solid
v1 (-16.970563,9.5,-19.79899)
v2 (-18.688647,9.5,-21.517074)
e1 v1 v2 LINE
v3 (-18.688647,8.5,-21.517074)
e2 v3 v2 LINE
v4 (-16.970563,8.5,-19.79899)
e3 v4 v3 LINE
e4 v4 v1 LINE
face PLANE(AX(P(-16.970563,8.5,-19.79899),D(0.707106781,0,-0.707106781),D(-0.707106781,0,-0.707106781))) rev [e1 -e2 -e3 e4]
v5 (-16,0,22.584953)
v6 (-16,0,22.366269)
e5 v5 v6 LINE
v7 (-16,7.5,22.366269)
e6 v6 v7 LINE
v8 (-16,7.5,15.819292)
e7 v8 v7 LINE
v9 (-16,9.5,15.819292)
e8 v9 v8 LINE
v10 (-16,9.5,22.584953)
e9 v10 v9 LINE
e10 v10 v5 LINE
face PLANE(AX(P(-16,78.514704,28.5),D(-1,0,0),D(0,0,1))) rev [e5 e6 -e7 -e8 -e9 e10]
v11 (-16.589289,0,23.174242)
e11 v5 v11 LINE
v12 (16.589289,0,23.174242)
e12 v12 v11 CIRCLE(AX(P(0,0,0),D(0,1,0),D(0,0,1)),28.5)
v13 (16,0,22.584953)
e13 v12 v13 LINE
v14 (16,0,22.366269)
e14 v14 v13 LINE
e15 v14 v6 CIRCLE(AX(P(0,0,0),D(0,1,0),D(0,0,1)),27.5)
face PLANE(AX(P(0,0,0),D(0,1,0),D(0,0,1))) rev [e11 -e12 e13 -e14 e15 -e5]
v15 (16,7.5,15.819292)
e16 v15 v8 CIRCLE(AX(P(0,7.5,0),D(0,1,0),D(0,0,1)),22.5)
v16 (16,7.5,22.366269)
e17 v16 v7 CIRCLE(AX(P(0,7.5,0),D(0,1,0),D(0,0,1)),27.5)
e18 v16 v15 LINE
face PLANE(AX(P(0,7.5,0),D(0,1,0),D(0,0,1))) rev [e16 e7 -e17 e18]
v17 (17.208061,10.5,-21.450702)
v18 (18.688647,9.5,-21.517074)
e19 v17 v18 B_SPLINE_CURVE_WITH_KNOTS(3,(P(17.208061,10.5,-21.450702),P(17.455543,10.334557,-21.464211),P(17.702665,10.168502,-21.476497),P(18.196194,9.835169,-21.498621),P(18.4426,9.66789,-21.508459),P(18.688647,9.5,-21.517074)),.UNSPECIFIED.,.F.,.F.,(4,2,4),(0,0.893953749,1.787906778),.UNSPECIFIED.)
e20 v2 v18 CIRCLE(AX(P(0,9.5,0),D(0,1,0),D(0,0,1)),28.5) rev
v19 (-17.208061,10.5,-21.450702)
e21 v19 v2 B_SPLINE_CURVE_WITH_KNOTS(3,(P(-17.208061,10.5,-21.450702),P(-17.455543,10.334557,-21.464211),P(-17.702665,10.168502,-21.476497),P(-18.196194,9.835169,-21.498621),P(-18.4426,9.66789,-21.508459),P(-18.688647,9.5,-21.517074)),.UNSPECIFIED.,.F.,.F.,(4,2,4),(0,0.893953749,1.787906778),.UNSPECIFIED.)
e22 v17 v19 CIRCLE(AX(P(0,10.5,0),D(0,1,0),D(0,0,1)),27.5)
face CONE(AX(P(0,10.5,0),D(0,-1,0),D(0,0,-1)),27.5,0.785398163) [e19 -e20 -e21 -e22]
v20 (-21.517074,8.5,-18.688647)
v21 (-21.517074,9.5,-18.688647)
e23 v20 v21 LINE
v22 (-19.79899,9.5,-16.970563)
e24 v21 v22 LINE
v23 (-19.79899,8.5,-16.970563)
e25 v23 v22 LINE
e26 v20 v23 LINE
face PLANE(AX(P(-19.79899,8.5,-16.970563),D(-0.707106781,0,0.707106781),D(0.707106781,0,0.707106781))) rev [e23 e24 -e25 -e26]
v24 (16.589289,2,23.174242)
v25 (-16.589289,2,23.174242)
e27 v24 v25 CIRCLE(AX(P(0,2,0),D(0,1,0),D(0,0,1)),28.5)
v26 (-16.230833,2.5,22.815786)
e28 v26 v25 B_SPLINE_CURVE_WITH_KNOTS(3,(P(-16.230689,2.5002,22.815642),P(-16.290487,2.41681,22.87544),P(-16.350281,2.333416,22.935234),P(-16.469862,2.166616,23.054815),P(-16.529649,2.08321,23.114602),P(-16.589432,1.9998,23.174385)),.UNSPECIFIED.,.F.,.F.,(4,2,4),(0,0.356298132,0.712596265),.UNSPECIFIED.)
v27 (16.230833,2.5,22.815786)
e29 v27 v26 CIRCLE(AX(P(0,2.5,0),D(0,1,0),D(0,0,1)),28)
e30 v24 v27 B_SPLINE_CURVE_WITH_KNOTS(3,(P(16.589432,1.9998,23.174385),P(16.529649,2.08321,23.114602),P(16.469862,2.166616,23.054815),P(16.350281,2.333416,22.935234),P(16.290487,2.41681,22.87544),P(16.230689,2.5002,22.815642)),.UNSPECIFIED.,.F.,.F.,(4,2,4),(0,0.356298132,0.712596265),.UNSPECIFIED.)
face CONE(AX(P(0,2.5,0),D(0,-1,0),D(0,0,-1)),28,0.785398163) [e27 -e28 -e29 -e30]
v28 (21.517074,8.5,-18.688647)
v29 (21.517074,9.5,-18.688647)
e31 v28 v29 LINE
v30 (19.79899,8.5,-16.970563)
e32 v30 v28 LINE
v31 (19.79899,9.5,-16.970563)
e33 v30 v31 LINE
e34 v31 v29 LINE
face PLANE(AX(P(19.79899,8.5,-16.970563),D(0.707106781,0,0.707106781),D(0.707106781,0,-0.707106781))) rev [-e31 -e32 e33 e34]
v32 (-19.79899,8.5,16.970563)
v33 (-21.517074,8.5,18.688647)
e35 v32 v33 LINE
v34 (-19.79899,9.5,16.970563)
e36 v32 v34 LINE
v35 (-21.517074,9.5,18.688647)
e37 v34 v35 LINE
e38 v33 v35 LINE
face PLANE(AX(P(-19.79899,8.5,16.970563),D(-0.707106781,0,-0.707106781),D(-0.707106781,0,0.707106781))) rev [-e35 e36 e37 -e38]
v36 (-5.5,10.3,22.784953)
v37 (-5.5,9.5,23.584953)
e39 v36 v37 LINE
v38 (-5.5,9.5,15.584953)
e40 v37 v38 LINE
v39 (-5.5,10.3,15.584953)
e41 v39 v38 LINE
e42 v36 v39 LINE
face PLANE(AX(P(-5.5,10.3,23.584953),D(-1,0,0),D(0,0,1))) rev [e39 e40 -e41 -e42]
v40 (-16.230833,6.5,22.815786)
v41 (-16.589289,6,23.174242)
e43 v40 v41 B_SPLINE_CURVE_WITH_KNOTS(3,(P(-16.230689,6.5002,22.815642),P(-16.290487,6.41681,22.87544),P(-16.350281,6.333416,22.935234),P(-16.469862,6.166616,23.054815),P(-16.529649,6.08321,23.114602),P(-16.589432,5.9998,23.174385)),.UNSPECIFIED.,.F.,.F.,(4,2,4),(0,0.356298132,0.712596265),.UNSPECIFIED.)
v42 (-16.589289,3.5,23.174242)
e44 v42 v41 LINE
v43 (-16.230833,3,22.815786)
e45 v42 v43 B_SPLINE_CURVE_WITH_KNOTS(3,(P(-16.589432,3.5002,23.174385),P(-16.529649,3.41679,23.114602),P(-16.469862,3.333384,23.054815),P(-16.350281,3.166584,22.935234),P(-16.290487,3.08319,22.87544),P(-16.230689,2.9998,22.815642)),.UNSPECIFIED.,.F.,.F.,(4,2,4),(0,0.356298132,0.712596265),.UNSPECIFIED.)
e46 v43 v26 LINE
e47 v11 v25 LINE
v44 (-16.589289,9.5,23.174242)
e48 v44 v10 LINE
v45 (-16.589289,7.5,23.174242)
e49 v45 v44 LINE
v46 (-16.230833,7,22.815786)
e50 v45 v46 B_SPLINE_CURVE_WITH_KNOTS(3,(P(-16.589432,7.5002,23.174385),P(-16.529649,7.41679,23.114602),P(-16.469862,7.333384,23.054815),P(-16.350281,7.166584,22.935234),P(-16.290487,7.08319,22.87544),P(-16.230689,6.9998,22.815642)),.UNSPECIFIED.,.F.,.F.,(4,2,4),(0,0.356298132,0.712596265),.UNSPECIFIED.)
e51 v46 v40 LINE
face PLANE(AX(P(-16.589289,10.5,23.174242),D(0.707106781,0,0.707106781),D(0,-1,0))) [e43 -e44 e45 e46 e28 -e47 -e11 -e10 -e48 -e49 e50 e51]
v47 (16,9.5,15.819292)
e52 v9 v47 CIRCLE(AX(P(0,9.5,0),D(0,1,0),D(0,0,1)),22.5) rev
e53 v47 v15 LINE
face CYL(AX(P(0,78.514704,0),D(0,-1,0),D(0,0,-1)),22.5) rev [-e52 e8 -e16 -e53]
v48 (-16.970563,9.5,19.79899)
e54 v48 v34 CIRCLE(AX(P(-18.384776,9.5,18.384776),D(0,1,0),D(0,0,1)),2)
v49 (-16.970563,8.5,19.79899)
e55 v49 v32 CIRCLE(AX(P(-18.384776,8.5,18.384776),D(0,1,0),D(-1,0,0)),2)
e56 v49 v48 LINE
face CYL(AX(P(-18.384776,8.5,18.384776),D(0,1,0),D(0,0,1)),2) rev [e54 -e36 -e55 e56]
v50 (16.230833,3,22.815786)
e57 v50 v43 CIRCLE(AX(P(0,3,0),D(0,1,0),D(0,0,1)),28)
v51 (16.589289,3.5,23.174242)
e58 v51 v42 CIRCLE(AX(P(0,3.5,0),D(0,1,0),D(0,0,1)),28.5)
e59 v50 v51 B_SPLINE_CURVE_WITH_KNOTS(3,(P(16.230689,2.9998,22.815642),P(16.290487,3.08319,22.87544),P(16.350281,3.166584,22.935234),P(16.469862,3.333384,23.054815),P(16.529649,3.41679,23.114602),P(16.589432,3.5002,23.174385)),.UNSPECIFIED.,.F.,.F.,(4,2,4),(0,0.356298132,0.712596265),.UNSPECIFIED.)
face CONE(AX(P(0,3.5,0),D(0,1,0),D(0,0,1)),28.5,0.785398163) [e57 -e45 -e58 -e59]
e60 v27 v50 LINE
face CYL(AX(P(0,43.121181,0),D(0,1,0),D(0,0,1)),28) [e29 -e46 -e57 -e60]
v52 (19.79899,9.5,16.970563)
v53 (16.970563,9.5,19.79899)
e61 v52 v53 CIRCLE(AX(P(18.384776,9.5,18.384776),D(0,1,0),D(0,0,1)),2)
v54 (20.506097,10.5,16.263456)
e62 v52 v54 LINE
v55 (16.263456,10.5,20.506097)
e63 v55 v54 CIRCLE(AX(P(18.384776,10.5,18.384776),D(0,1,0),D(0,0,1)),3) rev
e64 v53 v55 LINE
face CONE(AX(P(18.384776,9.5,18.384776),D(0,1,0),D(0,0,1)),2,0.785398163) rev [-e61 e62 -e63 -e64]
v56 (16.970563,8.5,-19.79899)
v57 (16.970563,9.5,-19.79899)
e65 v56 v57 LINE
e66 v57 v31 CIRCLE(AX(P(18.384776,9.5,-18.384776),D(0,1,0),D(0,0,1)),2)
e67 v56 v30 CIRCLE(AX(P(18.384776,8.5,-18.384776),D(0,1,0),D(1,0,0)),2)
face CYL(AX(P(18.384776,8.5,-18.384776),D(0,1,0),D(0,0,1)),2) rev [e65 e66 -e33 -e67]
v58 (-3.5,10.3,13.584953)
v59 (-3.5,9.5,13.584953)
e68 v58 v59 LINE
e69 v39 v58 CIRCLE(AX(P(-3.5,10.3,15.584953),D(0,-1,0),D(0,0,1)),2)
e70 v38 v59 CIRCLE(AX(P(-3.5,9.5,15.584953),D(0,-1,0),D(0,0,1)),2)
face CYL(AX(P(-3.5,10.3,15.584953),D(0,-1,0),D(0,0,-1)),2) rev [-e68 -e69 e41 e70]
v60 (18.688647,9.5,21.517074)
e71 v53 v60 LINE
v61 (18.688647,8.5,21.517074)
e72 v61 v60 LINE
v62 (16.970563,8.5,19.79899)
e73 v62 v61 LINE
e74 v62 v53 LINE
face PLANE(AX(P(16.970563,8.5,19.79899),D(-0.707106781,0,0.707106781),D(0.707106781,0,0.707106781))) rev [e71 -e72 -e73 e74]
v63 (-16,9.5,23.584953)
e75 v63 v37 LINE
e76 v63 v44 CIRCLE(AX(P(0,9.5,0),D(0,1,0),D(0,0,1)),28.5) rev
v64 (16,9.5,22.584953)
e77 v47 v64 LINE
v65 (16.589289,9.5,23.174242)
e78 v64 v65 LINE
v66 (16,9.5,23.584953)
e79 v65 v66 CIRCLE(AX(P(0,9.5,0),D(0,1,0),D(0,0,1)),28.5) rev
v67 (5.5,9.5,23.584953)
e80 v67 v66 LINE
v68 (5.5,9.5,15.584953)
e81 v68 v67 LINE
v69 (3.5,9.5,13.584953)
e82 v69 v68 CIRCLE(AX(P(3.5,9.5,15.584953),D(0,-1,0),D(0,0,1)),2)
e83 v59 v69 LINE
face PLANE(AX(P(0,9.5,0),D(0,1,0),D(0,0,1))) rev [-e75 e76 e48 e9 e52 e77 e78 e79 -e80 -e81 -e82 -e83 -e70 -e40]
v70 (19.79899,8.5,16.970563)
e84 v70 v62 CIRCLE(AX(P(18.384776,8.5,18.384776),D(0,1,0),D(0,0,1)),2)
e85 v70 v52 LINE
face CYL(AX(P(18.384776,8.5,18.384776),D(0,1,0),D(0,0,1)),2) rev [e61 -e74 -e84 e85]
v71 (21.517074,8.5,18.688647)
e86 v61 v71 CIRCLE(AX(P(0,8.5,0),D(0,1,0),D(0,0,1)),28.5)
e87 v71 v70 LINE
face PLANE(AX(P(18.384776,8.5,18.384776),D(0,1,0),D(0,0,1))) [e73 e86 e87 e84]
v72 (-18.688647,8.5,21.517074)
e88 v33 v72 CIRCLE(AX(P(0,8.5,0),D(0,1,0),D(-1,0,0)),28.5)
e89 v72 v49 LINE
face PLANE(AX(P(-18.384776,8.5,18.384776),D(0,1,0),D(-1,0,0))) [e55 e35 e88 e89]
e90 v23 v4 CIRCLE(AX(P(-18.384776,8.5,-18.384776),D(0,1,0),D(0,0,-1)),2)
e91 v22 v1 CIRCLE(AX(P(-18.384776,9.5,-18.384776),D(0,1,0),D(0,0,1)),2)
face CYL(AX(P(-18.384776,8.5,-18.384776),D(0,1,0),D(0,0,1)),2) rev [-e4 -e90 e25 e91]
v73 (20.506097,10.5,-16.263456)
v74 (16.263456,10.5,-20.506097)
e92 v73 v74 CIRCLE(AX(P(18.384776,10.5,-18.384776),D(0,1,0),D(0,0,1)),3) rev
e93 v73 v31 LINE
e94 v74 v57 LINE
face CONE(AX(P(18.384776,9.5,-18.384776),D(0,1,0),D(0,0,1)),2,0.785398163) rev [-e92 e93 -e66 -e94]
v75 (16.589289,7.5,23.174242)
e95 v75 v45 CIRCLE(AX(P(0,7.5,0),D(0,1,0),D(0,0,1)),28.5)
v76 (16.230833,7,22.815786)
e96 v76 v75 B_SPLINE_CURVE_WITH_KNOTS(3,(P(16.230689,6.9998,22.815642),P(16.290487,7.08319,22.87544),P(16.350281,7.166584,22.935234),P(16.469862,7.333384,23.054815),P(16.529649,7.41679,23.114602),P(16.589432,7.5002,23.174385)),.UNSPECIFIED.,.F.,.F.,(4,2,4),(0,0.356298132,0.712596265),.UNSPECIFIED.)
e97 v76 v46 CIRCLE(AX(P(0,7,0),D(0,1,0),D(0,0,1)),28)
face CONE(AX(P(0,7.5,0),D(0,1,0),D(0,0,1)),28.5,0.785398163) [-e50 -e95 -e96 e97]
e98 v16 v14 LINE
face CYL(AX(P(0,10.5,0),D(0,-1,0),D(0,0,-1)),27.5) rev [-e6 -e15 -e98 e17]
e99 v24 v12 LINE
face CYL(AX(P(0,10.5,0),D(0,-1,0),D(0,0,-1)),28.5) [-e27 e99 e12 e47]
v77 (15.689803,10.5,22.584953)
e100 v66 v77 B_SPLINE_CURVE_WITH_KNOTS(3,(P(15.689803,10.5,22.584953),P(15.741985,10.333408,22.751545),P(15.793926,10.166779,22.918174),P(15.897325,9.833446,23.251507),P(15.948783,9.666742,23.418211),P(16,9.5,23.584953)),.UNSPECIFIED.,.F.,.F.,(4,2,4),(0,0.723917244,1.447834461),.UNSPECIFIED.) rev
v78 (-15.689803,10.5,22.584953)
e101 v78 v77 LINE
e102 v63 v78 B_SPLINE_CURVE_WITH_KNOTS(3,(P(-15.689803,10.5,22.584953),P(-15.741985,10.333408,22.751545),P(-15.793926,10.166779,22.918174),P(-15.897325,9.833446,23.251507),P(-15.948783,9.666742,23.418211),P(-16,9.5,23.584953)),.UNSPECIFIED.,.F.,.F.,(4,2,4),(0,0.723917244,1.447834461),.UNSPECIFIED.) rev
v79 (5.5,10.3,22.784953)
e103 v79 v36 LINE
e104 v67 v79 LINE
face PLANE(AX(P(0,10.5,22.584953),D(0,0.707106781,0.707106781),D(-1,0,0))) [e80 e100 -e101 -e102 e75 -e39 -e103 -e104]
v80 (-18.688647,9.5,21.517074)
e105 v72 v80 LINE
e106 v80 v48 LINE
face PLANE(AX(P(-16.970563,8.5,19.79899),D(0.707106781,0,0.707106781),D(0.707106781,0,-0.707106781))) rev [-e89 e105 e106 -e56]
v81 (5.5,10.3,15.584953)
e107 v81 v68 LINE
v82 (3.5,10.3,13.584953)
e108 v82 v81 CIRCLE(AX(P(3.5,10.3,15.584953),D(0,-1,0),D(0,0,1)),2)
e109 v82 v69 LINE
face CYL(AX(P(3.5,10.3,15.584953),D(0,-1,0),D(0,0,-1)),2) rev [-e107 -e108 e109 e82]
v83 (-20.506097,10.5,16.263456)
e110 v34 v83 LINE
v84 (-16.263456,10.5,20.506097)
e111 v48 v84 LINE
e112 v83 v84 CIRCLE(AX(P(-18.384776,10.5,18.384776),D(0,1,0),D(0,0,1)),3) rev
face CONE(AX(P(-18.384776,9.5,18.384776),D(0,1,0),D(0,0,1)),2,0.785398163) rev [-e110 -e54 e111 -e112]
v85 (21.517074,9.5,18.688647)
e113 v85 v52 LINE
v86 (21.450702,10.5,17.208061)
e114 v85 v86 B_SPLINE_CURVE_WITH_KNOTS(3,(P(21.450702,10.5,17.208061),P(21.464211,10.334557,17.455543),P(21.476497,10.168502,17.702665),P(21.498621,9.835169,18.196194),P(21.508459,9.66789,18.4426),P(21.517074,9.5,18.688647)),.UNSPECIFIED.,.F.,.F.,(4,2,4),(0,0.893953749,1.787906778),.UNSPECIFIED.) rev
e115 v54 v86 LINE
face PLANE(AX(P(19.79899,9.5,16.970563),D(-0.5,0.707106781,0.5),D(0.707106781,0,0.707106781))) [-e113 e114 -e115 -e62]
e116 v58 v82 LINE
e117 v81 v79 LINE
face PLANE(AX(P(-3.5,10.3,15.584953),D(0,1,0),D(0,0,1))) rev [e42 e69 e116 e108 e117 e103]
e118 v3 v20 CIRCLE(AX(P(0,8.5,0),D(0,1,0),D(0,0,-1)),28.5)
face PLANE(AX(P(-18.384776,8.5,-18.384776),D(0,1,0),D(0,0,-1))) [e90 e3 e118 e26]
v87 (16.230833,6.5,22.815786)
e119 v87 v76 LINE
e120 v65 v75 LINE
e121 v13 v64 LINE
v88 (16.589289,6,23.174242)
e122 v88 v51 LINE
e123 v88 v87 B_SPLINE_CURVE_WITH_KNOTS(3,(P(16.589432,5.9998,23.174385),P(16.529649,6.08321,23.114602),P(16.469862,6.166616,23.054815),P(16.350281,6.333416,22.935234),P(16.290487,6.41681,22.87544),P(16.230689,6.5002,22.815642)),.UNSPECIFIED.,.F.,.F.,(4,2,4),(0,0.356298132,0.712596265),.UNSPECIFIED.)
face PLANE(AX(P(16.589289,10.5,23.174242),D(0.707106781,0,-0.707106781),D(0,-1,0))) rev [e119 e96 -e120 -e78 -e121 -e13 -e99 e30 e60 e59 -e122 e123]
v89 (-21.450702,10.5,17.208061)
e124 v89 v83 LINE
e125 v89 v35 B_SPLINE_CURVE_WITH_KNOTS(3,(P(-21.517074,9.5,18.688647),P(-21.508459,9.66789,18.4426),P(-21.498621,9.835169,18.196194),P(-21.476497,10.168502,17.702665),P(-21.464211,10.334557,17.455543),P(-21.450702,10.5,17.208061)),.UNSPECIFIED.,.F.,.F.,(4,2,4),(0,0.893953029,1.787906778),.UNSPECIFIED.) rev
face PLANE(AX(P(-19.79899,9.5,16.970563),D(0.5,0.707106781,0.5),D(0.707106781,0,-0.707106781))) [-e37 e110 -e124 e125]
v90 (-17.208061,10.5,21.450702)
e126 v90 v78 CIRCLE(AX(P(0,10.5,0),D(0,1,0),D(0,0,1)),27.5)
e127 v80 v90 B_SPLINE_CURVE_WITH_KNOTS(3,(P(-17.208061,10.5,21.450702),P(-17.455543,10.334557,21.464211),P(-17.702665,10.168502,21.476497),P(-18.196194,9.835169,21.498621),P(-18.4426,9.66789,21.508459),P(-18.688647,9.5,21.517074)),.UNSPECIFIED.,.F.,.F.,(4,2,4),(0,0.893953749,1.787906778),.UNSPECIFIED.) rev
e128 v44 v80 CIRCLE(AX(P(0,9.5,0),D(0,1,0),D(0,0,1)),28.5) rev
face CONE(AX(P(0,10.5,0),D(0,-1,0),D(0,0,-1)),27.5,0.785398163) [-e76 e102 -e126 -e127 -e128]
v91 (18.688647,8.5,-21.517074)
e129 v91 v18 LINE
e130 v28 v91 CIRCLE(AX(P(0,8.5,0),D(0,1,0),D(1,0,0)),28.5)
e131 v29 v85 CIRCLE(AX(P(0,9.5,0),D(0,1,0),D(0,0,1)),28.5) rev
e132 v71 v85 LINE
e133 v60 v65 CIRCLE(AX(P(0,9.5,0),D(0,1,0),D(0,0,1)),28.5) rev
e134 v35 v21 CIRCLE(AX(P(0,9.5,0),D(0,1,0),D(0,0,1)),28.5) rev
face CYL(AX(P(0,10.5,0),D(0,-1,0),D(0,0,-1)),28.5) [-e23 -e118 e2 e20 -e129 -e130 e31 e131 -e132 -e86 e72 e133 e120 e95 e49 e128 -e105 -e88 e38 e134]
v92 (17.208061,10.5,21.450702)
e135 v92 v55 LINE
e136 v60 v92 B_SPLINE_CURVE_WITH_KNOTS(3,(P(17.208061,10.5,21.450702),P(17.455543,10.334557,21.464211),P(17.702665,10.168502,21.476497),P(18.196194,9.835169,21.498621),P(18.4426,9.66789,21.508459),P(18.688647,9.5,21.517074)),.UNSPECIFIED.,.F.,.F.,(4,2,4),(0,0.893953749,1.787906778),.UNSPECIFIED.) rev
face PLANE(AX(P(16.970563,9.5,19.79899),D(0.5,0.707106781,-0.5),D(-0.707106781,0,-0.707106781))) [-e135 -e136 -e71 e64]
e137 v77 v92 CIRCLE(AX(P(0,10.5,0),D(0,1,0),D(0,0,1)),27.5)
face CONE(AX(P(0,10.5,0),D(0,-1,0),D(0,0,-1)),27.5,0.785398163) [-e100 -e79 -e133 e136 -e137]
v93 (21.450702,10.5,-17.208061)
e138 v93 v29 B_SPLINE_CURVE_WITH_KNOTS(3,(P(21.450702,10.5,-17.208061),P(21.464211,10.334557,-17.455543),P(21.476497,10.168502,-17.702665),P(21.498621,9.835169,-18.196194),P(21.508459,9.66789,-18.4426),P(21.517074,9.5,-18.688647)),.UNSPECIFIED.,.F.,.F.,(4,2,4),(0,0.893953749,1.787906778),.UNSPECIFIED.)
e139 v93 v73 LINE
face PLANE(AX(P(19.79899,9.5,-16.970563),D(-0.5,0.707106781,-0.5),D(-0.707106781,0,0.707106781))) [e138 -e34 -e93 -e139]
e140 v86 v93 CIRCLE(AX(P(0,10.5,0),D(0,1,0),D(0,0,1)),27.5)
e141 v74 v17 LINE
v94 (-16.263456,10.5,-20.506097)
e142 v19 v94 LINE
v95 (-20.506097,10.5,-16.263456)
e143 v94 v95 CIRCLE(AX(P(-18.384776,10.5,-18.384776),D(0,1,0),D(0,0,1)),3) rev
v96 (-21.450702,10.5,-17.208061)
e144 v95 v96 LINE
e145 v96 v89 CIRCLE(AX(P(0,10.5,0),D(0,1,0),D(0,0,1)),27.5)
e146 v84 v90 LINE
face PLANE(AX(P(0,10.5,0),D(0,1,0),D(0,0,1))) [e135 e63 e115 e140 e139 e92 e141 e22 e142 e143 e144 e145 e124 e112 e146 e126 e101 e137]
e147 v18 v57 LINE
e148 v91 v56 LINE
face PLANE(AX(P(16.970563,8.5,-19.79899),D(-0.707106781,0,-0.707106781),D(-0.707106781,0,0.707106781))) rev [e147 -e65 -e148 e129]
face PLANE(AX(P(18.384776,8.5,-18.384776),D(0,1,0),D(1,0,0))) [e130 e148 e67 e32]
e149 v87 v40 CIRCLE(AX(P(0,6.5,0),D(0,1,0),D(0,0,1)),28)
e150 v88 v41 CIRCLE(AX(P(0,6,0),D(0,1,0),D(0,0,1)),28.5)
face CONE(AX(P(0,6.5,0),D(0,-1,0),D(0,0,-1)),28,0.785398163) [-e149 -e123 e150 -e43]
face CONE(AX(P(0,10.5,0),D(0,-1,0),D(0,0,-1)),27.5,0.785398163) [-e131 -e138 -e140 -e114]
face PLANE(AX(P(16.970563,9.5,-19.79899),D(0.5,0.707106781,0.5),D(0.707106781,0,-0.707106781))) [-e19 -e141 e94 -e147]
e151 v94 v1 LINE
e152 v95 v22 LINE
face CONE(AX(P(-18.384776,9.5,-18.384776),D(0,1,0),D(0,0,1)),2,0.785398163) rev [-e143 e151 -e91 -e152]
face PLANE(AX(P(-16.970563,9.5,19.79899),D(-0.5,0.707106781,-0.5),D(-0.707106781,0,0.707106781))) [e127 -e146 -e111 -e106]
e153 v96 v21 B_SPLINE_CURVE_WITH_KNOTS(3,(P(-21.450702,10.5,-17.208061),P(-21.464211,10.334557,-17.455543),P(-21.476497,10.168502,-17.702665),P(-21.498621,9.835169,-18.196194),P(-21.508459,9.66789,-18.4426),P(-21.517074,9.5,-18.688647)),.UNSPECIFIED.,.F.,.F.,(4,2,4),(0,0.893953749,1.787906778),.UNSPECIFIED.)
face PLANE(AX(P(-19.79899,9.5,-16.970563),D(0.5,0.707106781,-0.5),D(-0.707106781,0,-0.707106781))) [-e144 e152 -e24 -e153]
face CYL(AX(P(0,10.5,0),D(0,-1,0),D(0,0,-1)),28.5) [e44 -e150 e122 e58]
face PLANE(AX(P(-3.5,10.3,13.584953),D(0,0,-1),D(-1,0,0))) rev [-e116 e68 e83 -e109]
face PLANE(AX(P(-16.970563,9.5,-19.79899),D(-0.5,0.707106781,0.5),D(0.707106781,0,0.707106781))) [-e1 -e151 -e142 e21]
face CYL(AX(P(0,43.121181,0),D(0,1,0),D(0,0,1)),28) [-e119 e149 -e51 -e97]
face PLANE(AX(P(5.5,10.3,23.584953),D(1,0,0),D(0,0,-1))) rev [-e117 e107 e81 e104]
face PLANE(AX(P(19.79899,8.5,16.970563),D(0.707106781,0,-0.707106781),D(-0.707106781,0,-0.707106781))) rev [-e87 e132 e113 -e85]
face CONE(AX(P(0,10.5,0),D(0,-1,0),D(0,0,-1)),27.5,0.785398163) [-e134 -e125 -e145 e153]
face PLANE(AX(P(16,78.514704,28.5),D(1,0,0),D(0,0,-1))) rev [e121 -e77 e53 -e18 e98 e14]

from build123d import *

# Parameters (mm, degrees)
SKETCH1_R           = 28.5
BOSS_EXTRUDE1_DEPTH = 10.5
SHELL1_OUTLINE_R    = 27.5
SHELL1_DEPTH        = 7.5
CUT_EXTRUDE3_DEPTH  = 9.5
CUT_EXTRUDE4_DEPTH  = 42.409539964
CUT_EXTRUDE2_START  = -2
CUT_EXTRUDE2_DEPTH  = 2
CIRPATTERN1_COUNT   = 4
CHAMFER2_SIZE       = 1
CUT_EXTRUDE5_DEPTH  = 0.8
CHAMFER3_SIZE       = 1


with BuildPart() as part:
    # Sketch1 → Boss-Extrude1 (new body)
    with BuildSketch(Plane(origin=(0, 0, 0), x_dir=(1, 0, 0), z_dir=(0, 1, 0))):
        with Locations(Location((0, 0, 0), (0, 0, 90))):
            Circle(SKETCH1_R)
    extrude(amount=BOSS_EXTRUDE1_DEPTH)

    # Shell1: read off the stored shape, not the designer's step
    # Shell1 outline → Shell1 (cut)
    with BuildSketch(Plane(origin=(0, 0, 0), x_dir=(1, 0, 0), z_dir=(0, 1, 0))):
        Circle(SHELL1_OUTLINE_R)
    extrude(amount=SHELL1_DEPTH, mode=Mode.SUBTRACT)

    # Sketch6 → Cut-Extrude3 (cut)
    with BuildSketch(Plane.XZ):
        with BuildLine():
            Line((16, 28.5), (16, 15.81929202))
            ThreePointArc((16, 15.81929202), (0, -22.5), (-16, 15.81929202))
            Line((-16, 15.81929202), (-16, 28.5))
            Line((-16, 28.5), (16, 28.5))
        make_face()
    extrude(amount=-CUT_EXTRUDE3_DEPTH, mode=Mode.SUBTRACT)

    # Sketch7 → Cut-Extrude4 (cut, through all)
    with BuildSketch(Plane.XZ.offset(-9.5)):
        with BuildLine():
            Line((-16, 23.58495283), (16, 23.58495283))
            ThreePointArc((16, 23.58495283), (0, 28.5), (-16, 23.58495283))
        make_face()
    extrude(amount=-CUT_EXTRUDE4_DEPTH, mode=Mode.SUBTRACT)

    # Sketch3 → Cut-Extrude2 (cut)
    with BuildSketch(Plane(origin=(0, 10.5, 0), x_dir=(1, 0, 0), z_dir=(0, 1, 0)).offset(CUT_EXTRUDE2_START)):
        with BuildLine():
            Line((16.970562748, -19.798989873), (18.688646931, -21.517074055))
            ThreePointArc((18.688646931, -21.517074055), (20.152543264, -20.152543264), (21.517074055, -18.688646931))
            Line((21.517074055, -18.688646931), (19.798989873, -16.970562748))
            ThreePointArc((19.798989873, -16.970562748), (16.970562748, -16.970562748), (16.970562748, -19.798989873))
        make_face()
    cut_extrude2 = extrude(amount=CUT_EXTRUDE2_DEPTH, mode=Mode.SUBTRACT)

    # CirPattern1: Cut-Extrude2 ×4 about axis
    cirpattern1_axis = Axis((0, 0, 0), (0, 1, 0))
    for i in range(1, CIRPATTERN1_COUNT):
        add(cut_extrude2.rotate(cirpattern1_axis, i * 360 / CIRPATTERN1_COUNT), mode=Mode.SUBTRACT)

    # Chamfer2
    chamfer2_edges = [part.edges().sort_by_distance(p)[0] for p in [
        (-20.658031964, 10.5, 17.82960484),
        (-16.970562748, 10.5, 16.970562748),
        (-17.82960484, 10.5, 20.658031964),
        (-17.375114018, 10.5, 22.591047184),
        (0, 10.5, 23.58495283),
        (17.375114018, 10.5, 22.591047184),
        (17.82960484, 10.5, 20.658031964),
        (16.970562748, 10.5, 16.970562748),
        (20.658031964, 10.5, 17.82960484),
        (28.5, 10.5, 0),
        (20.658031964, 10.5, -17.82960484),
        (16.970562748, 10.5, -16.970562748),
        (17.82960484, 10.5, -20.658031964),
        (0, 10.5, -28.5),
        (-17.82960484, 10.5, -20.658031964),
        (-16.970562748, 10.5, -16.970562748),
        (-20.658031964, 10.5, -17.82960484),
        (-28.5, 10.5, 0),
    ]]
    chamfer(chamfer2_edges, length=CHAMFER2_SIZE - 0.0001)  # a hair under: the kernel refuses the full size

    # Sketch9 → Cut-Extrude5 (cut)
    with BuildSketch(Plane.XZ.offset(-9.5)):
        with BuildLine():
            Line((-5.5, 23.58495283), (5.5, 23.58495283))
            Line((5.5, 23.58495283), (5.5, 15.58495283))
            ThreePointArc((5.5, 15.58495283), (4.914213562, 14.170739268), (3.5, 13.58495283))
            Line((3.5, 13.58495283), (-3.5, 13.58495283))
            ThreePointArc((-3.5, 13.58495283), (-4.914213562, 14.170739268), (-5.5, 15.58495283))
            Line((-5.5, 15.58495283), (-5.5, 23.58495283))
        make_face()
    extrude(amount=-CUT_EXTRUDE5_DEPTH, mode=Mode.SUBTRACT)

    # Chamfer3
    # the kernel refuses this chamfer: 1, 0.719970543 mm, written as the material it takes off along each edge
    with BuildSketch(Plane(origin=(-16, 9.5, 23.58495283), x_dir=(-0.8204018927518858, 0, -0.5717873156770121), z_dir=(0, -1, 0))) as chamfer3_piece_1:
        with BuildLine():
            Line((0.71829317, 0), (CHAMFER3_SIZE * 0.571787315677, CHAMFER3_SIZE * 0.820401892752))
            Line((CHAMFER3_SIZE * 0.571787315677, CHAMFER3_SIZE * 0.820401892752), (0, 0))
            ThreePointArc((0, 0), (0.362660378, -0.00226279), (0.71829317, 0))
        make_face()
    extrude(amount=12.071682988, mode=Mode.SUBTRACT)
    with BuildSketch(Plane(origin=(16, 9.5, 23.58495283), x_dir=(0.8204018927518871, 0, -0.5717873156770101), z_dir=(0, -1, 0))) as chamfer3_piece_2:
        with BuildLine():
            Line((0.71829317, 0), (CHAMFER3_SIZE * 0.571787315677, -CHAMFER3_SIZE * 0.820401892752))
            Line((CHAMFER3_SIZE * 0.571787315677, -CHAMFER3_SIZE * 0.820401892752), (0, 0))
            ThreePointArc((0, 0), (0.362660378, 0.00226279), (0.71829317, 0))
        make_face()
    extrude(amount=12.071682988, mode=Mode.SUBTRACT)

    # Sketch11 → Cut-Revolve2 (revolve, cut)
    with BuildSketch(Plane.XY):
        Polygon((28, 7), (28, 6.5), (28.5, 6), (28.5, 3.5), (28, 3), (28, 2.5), (28.5, 2), (29.5, 2), (29.5, 7.5), (28.5, 7.5), align=None)
    revolve(axis=Axis((0, 43.121181377, 0), (0, -1, 0)), mode=Mode.SUBTRACT)


solid = part.part
